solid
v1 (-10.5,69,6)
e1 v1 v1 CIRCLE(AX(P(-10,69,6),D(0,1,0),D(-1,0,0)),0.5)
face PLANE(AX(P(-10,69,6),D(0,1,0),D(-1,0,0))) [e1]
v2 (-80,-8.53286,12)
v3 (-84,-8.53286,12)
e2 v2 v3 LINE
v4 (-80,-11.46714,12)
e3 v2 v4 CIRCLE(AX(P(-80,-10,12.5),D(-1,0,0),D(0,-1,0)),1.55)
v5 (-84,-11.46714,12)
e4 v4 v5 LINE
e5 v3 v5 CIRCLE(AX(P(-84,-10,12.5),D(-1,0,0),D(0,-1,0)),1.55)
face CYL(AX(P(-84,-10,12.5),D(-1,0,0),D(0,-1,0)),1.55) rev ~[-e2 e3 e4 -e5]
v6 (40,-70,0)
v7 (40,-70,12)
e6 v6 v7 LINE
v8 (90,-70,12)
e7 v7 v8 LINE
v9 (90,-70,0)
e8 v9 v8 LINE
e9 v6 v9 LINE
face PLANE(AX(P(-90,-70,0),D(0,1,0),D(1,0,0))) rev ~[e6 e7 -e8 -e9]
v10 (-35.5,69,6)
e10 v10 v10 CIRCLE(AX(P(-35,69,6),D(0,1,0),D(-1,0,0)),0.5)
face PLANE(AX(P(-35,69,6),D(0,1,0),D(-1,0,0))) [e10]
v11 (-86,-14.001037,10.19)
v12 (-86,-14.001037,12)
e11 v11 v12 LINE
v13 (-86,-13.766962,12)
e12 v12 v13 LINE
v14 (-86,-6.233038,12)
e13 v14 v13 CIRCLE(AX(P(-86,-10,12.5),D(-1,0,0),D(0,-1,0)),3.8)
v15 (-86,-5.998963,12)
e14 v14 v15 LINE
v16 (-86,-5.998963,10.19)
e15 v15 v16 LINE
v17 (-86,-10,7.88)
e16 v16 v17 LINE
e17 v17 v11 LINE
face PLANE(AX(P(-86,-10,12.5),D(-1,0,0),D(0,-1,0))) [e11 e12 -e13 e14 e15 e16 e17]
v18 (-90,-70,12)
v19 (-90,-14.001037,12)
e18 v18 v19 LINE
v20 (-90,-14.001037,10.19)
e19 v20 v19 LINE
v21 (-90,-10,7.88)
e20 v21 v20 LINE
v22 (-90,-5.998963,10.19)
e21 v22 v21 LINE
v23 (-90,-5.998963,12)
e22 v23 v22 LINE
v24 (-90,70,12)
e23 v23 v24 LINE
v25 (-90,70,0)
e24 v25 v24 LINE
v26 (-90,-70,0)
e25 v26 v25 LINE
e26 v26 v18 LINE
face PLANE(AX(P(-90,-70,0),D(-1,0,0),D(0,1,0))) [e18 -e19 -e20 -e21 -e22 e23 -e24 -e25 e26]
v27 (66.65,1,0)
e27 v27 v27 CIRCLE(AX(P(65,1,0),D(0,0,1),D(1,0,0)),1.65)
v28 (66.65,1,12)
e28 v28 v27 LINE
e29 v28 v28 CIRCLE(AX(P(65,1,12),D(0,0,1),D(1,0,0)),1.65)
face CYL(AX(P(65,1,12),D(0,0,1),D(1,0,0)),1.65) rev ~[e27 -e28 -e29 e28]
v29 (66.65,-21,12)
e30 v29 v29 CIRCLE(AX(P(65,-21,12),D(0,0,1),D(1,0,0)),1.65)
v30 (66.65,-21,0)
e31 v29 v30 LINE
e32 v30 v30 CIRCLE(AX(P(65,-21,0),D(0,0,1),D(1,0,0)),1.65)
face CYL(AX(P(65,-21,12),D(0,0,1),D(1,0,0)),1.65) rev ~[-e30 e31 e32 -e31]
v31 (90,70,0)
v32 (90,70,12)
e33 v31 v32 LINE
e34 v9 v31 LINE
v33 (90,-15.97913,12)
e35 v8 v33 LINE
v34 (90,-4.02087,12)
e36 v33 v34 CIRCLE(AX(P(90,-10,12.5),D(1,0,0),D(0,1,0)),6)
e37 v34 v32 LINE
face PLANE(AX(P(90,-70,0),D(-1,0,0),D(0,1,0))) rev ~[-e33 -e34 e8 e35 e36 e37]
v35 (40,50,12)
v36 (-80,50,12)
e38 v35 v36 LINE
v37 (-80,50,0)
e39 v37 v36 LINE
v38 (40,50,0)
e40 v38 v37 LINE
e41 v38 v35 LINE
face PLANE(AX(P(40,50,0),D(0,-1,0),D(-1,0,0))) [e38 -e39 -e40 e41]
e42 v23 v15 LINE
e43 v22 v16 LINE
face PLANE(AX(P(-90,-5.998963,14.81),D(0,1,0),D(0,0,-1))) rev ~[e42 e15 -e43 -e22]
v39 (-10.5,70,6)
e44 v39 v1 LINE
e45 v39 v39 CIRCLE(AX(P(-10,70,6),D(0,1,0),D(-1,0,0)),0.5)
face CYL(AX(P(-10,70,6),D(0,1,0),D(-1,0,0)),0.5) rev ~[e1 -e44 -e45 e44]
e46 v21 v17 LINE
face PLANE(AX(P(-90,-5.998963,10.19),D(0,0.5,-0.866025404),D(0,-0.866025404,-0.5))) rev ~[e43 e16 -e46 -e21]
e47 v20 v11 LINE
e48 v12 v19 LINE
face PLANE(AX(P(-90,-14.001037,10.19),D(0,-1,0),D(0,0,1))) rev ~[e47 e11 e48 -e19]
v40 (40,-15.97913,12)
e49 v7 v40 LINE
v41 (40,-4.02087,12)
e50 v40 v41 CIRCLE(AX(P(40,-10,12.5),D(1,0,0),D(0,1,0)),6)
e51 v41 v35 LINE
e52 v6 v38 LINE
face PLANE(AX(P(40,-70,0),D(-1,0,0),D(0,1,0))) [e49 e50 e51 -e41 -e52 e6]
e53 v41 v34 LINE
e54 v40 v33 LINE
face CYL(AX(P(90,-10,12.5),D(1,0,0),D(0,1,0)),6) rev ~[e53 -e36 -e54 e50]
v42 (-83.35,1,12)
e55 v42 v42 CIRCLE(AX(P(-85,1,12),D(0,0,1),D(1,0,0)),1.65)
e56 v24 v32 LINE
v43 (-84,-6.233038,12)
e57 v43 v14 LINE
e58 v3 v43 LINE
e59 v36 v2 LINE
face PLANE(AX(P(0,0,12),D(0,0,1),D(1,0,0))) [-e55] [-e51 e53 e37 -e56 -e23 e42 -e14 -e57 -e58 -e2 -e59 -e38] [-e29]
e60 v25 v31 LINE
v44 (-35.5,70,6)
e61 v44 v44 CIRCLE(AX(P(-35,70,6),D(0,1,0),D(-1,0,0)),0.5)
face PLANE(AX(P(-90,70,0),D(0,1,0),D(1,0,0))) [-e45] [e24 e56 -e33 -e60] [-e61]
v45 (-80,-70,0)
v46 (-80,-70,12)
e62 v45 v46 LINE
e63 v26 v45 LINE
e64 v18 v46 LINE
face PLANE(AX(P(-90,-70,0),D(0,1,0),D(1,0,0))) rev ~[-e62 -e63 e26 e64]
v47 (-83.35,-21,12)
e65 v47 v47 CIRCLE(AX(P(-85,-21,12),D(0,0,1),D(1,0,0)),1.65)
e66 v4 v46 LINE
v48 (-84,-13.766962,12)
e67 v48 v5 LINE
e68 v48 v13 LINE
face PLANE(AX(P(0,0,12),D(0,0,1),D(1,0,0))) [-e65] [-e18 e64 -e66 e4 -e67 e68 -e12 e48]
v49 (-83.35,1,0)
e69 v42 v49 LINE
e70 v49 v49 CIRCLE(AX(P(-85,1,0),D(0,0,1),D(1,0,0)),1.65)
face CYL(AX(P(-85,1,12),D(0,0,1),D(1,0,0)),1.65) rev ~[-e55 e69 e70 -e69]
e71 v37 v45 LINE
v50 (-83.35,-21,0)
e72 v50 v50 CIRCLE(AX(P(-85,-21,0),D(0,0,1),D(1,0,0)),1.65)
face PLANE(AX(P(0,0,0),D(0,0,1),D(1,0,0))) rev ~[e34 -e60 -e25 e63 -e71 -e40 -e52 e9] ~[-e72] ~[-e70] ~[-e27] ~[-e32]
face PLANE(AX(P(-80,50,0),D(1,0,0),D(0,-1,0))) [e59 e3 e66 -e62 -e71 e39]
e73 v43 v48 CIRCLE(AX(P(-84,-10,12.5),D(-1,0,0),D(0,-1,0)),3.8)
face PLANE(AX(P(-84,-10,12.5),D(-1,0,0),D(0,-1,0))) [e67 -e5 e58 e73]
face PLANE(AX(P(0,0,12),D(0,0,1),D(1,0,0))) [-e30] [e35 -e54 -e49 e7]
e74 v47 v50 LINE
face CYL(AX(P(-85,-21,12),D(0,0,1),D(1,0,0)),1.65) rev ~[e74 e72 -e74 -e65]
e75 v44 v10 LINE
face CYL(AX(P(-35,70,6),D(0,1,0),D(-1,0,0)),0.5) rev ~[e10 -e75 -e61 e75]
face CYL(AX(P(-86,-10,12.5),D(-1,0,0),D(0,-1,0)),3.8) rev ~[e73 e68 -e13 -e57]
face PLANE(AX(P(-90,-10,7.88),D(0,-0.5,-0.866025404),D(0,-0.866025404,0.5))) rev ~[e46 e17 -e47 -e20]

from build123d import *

# Parameters (mm, degrees)
F0_W      = 180
F0_H      = 140
F1_DEPTH  = 30
F4_DEPTH  = 30
F5_DEPTH  = 4
F6_R      = 3.8
F7_DEPTH  = 2
F8_R      = 1.55
F9_DEPTH  = 7
F10_R     = 6
F12_DEPTH = 50
F11_R     = 0.5
F13_DEPTH = 1
F14_W     = 180
F14_H     = 140
F15_DEPTH = 18
F16_R     = 1.65
F17_DEPTH = 12


# Not quite as in the source:
# - a feature names something its author has since deleted; it is built from what else it names


with BuildPart() as f1:
    # F0 (on Top) → F1 (new body)
    with BuildSketch(Plane.XY):
        Rectangle(F0_W, F0_H)
    extrude(amount=F1_DEPTH)

    # F3 (on Top) → F4 (cut, through all)
    with BuildSketch(Plane.XY):
        Polygon((40, -70), (40, 0), (40, 50), (0, 50), (-80, 50), (-80, -70), align=None)
    extrude(amount=F4_DEPTH, mode=Mode.SUBTRACT)

    # F2 (on face) → F5 (cut)
    with BuildSketch(Plane(origin=(-90, 0, 0), x_dir=(0, -1, 0), z_dir=(-1, 0, 0))):
        Polygon((10, 17.12), (5.9989626345, 14.81), (5.9989626345, 10.19), (10, 7.88), (14.0010373655, 10.19), (14.0010373655, 14.81), align=None)
    extrude(amount=-F5_DEPTH, mode=Mode.SUBTRACT)

    # F6 (on face) → F7 (cut)
    with BuildSketch(Plane(origin=(-86, 0, 0), x_dir=(0, -1, 0), z_dir=(-1, 0, 0))):
        with Locations((10, 12.5)):
            Circle(F6_R)
    extrude(amount=-F7_DEPTH, mode=Mode.SUBTRACT)

    # F8 (on face) → F9 (cut)
    with BuildSketch(Plane(origin=(-84, 0, 0), x_dir=(0, -1, 0), z_dir=(-1, 0, 0))):
        with Locations((10, 12.5)):
            Circle(F8_R)
    extrude(amount=-F9_DEPTH, mode=Mode.SUBTRACT)

    # F10 (on face) → F12 (cut, through all)
    with BuildSketch(Plane.YZ.offset(90)):
        with Locations((-10, 12.5)):
            Circle(F10_R)
    extrude(amount=-F12_DEPTH, mode=Mode.SUBTRACT)

    # F11 (on face) → F13 (cut)
    with BuildSketch(Plane(origin=(0, 70, 0), x_dir=(-1, 0, 0), z_dir=(0, 1, 0))):
        with Locations((35, 6)):
            Circle(F11_R)
        with Locations((10, 6)):
            Circle(F11_R)
    extrude(amount=-F13_DEPTH, mode=Mode.SUBTRACT)

    # F14 (on face) → F15 (cut)
    with BuildSketch(Plane.XY.offset(30)):
        Rectangle(F14_W, F14_H)
    extrude(amount=-F15_DEPTH, mode=Mode.SUBTRACT)

    # F16 (on face) → F17 (cut, through all)
    with BuildSketch(Plane.XY.offset(12)):
        with Locations((65, 1)):
            Circle(F16_R)
        with Locations((65, -21)):
            Circle(F16_R)
        with Locations((-85, 1)):
            Circle(F16_R)
        with Locations((-85, -21)):
            Circle(F16_R)
    extrude(amount=-F17_DEPTH, mode=Mode.SUBTRACT)


solid = f1.part
